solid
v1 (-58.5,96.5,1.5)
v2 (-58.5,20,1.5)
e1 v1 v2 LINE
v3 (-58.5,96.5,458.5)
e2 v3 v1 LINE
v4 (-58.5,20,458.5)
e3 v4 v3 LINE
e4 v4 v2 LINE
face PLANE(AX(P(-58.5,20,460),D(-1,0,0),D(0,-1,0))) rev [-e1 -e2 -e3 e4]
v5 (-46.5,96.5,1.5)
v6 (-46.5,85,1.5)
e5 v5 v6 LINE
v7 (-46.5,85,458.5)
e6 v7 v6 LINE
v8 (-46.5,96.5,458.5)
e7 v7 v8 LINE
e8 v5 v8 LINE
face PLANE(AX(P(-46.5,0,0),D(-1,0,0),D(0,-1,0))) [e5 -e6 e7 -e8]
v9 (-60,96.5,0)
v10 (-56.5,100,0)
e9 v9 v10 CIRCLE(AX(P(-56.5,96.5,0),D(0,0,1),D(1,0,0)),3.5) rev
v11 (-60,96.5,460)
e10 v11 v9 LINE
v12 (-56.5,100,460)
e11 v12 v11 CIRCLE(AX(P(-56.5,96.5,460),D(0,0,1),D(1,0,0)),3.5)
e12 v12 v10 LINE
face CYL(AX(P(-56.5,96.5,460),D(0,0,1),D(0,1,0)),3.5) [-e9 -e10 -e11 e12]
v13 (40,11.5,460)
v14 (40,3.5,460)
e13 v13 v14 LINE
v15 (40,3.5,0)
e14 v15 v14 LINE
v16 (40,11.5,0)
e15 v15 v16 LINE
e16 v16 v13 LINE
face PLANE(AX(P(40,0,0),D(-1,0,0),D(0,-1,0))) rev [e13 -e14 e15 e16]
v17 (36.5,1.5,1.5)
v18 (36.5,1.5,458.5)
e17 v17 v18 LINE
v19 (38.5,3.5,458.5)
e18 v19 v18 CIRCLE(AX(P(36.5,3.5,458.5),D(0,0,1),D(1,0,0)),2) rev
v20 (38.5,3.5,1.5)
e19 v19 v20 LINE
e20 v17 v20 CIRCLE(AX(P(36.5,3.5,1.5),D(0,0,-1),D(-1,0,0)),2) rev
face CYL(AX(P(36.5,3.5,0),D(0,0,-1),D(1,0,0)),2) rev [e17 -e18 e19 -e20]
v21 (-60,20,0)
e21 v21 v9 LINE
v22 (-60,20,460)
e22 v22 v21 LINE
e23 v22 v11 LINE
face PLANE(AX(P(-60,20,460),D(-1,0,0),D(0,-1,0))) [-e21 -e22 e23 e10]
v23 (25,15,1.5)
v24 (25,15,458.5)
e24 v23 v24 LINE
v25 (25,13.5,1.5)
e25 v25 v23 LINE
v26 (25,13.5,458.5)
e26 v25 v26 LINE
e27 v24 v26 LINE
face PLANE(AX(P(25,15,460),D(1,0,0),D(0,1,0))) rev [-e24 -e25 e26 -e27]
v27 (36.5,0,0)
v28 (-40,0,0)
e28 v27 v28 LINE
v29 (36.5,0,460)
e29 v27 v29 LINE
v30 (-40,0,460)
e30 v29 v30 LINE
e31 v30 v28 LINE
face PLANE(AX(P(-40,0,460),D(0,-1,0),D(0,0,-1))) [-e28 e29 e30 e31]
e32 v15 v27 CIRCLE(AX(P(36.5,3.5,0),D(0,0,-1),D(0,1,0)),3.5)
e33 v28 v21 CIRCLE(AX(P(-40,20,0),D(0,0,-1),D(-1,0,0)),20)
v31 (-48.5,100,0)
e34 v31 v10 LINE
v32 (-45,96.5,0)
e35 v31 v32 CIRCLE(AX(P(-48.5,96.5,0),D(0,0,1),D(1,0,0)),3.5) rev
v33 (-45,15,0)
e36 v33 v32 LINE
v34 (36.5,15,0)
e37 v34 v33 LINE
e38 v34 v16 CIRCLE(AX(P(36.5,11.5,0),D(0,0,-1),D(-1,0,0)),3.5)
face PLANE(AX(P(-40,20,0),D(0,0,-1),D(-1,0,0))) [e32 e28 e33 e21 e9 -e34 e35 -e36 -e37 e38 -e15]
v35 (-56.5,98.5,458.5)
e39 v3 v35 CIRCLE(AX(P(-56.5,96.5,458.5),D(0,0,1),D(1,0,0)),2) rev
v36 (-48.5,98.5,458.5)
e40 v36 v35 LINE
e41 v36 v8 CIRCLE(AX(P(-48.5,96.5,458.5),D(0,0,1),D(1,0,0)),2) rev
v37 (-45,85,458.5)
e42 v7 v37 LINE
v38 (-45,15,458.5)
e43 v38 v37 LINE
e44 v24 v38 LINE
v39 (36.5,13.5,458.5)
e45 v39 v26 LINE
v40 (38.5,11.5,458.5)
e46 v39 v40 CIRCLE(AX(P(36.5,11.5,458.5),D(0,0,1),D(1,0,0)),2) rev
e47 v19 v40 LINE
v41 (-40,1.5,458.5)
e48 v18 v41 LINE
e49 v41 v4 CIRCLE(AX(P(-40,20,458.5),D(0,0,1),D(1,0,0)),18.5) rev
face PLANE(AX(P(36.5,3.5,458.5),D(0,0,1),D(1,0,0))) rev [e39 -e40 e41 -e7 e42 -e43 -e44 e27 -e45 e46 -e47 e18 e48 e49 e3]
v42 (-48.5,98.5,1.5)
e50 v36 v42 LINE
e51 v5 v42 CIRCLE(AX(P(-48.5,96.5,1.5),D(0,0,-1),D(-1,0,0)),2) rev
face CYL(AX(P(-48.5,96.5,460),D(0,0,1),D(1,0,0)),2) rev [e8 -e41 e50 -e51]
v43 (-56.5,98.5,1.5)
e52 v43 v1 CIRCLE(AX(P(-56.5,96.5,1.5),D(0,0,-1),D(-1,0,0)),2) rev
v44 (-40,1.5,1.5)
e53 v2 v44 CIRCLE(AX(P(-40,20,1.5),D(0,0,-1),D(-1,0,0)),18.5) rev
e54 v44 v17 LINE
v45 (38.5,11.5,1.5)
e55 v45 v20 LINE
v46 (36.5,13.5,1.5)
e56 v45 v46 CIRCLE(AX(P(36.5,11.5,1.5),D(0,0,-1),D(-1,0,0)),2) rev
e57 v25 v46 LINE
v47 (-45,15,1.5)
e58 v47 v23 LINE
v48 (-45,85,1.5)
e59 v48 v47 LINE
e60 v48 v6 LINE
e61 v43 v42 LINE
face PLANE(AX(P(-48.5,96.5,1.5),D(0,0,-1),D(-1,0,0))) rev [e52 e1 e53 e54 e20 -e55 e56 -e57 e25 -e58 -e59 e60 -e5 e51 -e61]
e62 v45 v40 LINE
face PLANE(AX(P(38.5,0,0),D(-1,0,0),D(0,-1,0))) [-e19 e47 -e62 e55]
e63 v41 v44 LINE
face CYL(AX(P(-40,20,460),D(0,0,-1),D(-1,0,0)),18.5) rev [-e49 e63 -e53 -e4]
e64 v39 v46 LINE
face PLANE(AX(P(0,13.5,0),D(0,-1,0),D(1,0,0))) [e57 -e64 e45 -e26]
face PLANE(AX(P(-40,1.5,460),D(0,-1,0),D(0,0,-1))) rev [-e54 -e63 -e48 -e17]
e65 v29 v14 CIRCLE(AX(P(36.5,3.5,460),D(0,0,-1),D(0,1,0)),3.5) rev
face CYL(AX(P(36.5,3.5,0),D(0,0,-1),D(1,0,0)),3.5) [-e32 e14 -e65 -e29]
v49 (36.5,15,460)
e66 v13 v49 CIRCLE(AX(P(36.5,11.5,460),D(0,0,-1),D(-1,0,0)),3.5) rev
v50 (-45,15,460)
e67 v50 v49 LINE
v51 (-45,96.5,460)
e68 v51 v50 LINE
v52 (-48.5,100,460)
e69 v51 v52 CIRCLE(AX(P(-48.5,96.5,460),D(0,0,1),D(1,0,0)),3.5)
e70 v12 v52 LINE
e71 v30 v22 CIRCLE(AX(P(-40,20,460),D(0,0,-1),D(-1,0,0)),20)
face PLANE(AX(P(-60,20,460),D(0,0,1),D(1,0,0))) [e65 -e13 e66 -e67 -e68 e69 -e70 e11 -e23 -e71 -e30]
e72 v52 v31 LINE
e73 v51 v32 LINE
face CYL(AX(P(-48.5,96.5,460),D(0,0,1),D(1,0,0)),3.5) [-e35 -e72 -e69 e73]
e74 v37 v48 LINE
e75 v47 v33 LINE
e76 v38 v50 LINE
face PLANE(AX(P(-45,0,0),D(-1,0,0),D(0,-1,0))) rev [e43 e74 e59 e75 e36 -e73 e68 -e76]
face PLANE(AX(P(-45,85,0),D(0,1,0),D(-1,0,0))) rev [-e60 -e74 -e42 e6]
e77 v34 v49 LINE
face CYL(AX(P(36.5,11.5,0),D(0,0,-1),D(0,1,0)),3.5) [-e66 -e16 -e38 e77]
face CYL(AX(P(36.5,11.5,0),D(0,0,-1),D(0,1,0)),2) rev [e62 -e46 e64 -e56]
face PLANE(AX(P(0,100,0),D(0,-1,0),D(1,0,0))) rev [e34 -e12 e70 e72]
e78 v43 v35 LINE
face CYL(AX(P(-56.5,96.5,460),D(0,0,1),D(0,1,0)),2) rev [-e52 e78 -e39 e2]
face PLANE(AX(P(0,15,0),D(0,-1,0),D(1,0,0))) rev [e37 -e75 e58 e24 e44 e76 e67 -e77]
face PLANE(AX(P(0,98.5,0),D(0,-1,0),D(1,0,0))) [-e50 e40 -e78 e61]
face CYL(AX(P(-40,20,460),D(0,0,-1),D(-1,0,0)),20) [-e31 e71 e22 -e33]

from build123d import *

# Parameters (mm, degrees)
SM_BASE_FLANGE_1_DEPTH             = 460
SM_EDGE_FLANGE_1_STRIP_W           = 10
SM_EDGE_FLANGE_1_STRIP_H           = 1.5
SM_EDGE_FLANGE_1_STRIP_CUT_DEPTH   = 460
SM_EDGE_FLANGE_1_STRIP_2_W         = 10
SM_EDGE_FLANGE_1_STRIP_2_H         = 1.5
SM_EDGE_FLANGE_1_STRIP_CUT_2_DEPTH = 460
SM_EDGE_FLANGE_1_DEPTH             = 460
SM_EDGE_FLANGE_1_BEND_DEPTH        = 460
SM_EDGE_FLANGE_2_STRIP_W           = 10
SM_EDGE_FLANGE_2_STRIP_H           = 1.5
SM_EDGE_FLANGE_2_STRIP_CUT_DEPTH   = 460
SM_EDGE_FLANGE_2_STRIP_2_W         = 10
SM_EDGE_FLANGE_2_STRIP_2_H         = 1.5
SM_EDGE_FLANGE_2_STRIP_CUT_2_DEPTH = 460
SM_EDGE_FLANGE_2_DEPTH             = 460
SM_EDGE_FLANGE_2_BEND_DEPTH        = 460
EXTRUDE_START                      = -1.5
EXTRUDE_1_DEPTH                    = 1.5
EXTRUDE_2_DEPTH                    = 1.5


# Sheet-metal steps are written as plain solids
with BuildPart() as part:
    # 草图1 → 基体-法兰1 (new body)
    with BuildSketch(Plane.XY):
        with BuildLine():
            Line((-60, 100), (-60, 20))
            ThreePointArc((-60, 20), (-54.142135624, 5.857864376), (-40, 0))
            Line((-40, 0), (40, 0))
            Line((40, 0), (40, 1.5))
            Line((40, 1.5), (-40, 1.5))
            ThreePointArc((-40, 1.5), (-53.081475452, 6.918524548), (-58.5, 20))
            Line((-58.5, 20), (-58.5, 100))
            Line((-58.5, 100), (-60, 100))
        make_face()
    extrude(amount=SM_BASE_FLANGE_1_DEPTH)

    # 边线-法兰1 strip (across the edge) → 边线-法兰1 strip cut (cut)
    with BuildSketch(Plane(origin=(40, 1.5, 460), x_dir=(-1, 0, 0), z_dir=(0, 0, -1))):
        with Locations((-1.5, -0.75)):
            Rectangle(SM_EDGE_FLANGE_1_STRIP_W, SM_EDGE_FLANGE_1_STRIP_H)
    extrude(amount=SM_EDGE_FLANGE_1_STRIP_CUT_DEPTH, mode=Mode.SUBTRACT)

    # 边线-法兰1 strip 2 (across the edge) → 边线-法兰1 strip cut 2 (cut)
    with BuildSketch(Plane(origin=(-58.5, 100, 0), x_dir=(0, -1, 0), z_dir=(0, 0, 1))):
        with Locations((-1.5, -0.75)):
            Rectangle(SM_EDGE_FLANGE_1_STRIP_2_W, SM_EDGE_FLANGE_1_STRIP_2_H)
    extrude(amount=SM_EDGE_FLANGE_1_STRIP_CUT_2_DEPTH, mode=Mode.SUBTRACT)

    # 边线-法兰1 section (across the edge) → 边线-法兰1 (add)
    with BuildSketch(Plane(origin=(40, 1.5, 460), x_dir=(-1, 0, 0), z_dir=(0, 0, -1))):
        with BuildLine():
            Line((0, 2), (0, 13.5))
            Line((0, 13.5), (1.5, 13.5))
            Line((1.5, 13.5), (1.5, 2))
            ThreePointArc((1.5, 2), (2.085786438, 0.585786438), (3.5, 0))
            Line((3.5, 0), (3.5, -1.5))
            ThreePointArc((3.5, -1.5), (1.025126266, -0.474873734), (0, 2))
        make_face()
    extrude(amount=SM_EDGE_FLANGE_1_DEPTH)

    # 边线-法兰1 section 2 (across the edge) → 边线-法兰1 bend (add)
    with BuildSketch(Plane(origin=(-58.5, 100, 0), x_dir=(0, -1, 0), z_dir=(0, 0, 1))):
        with BuildLine():
            Line((0, 2), (0, 13.5))
            Line((0, 13.5), (1.5, 13.5))
            Line((1.5, 13.5), (1.5, 2))
            ThreePointArc((1.5, 2), (2.085786438, 0.585786438), (3.5, 0))
            Line((3.5, 0), (3.5, -1.5))
            ThreePointArc((3.5, -1.5), (1.025126266, -0.474873734), (0, 2))
        make_face()
    extrude(amount=SM_EDGE_FLANGE_1_BEND_DEPTH)

    # 边线-法兰2 strip (across the edge) → 边线-法兰2 strip cut (cut)
    with BuildSketch(Plane(origin=(38.5, 15, 460), x_dir=(0, -1, 0), z_dir=(0, 0, -1))):
        with Locations((-1.5, -0.75)):
            Rectangle(SM_EDGE_FLANGE_2_STRIP_W, SM_EDGE_FLANGE_2_STRIP_H)
    extrude(amount=SM_EDGE_FLANGE_2_STRIP_CUT_DEPTH, mode=Mode.SUBTRACT)

    # 边线-法兰2 strip 2 (across the edge) → 边线-法兰2 strip cut 2 (cut)
    with BuildSketch(Plane(origin=(-45, 98.5, 0), x_dir=(-1, 0, 0), z_dir=(0, 0, 1))):
        with Locations((-1.5, -0.75)):
            Rectangle(SM_EDGE_FLANGE_2_STRIP_2_W, SM_EDGE_FLANGE_2_STRIP_2_H)
    extrude(amount=SM_EDGE_FLANGE_2_STRIP_CUT_2_DEPTH, mode=Mode.SUBTRACT)

    # 边线-法兰2 section (across the edge) → 边线-法兰2 (add)
    with BuildSketch(Plane(origin=(38.5, 15, 460), x_dir=(0, -1, 0), z_dir=(0, 0, -1))):
        with BuildLine():
            Line((0, 2), (0, 13.5))
            Line((0, 13.5), (1.5, 13.5))
            Line((1.5, 13.5), (1.5, 2))
            ThreePointArc((1.5, 2), (2.085786438, 0.585786438), (3.5, 0))
            Line((3.5, 0), (3.5, -1.5))
            ThreePointArc((3.5, -1.5), (1.025126266, -0.474873734), (0, 2))
        make_face()
    extrude(amount=SM_EDGE_FLANGE_2_DEPTH)

    # 边线-法兰2 section 2 (across the edge) → 边线-法兰2 bend (add)
    with BuildSketch(Plane(origin=(-45, 98.5, 0), x_dir=(-1, 0, 0), z_dir=(0, 0, 1))):
        with BuildLine():
            Line((0, 2), (0, 13.5))
            Line((0, 13.5), (1.5, 13.5))
            Line((1.5, 13.5), (1.5, 2))
            ThreePointArc((1.5, 2), (2.085786438, 0.585786438), (3.5, 0))
            Line((3.5, 0), (3.5, -1.5))
            ThreePointArc((3.5, -1.5), (1.025126266, -0.474873734), (0, 2))
        make_face()
    extrude(amount=SM_EDGE_FLANGE_2_BEND_DEPTH)

    # 草图22 → 凸台-拉伸1 (add)
    with BuildSketch(Plane.XY.offset(460).offset(EXTRUDE_START)):
        with BuildLine():
            Line((-45, 96.5), (-45, 85))
            Line((-45, 85), (-45, 15))
            Line((-45, 15), (25, 15))
            Line((25, 15), (36.5, 15))
            ThreePointArc((36.5, 15), (38.974873734, 13.974873734), (40, 11.5))
            Line((40, 11.5), (40, 3.5))
            ThreePointArc((40, 3.5), (38.974873734, 1.025126266), (36.5, 0))
            Line((36.5, 0), (-40, 0))
            ThreePointArc((-40, 0), (-54.142135624, 5.857864376), (-60, 20))
            Line((-60, 20), (-60, 96.5))
            ThreePointArc((-60, 96.5), (-58.974873734, 98.974873734), (-56.5, 100))
            Line((-56.5, 100), (-48.5, 100))
            ThreePointArc((-48.5, 100), (-46.025126266, 98.974873734), (-45, 96.5))
        make_face()
    extrude(amount=EXTRUDE_1_DEPTH)

    # 草图23 → 凸台-拉伸2 (add)
    with BuildSketch(Plane(origin=(0, 0, 0), x_dir=(-1, 0, 0), z_dir=(0, 0, -1))):
        with BuildLine():
            Line((-25, 15), (45, 15))
            Line((45, 15), (45, 85))
            Line((45, 85), (45, 96.5))
            ThreePointArc((45, 96.5), (46.025126266, 98.974873734), (48.5, 100))
            Line((48.5, 100), (56.5, 100))
            ThreePointArc((56.5, 100), (58.974873734, 98.974873734), (60, 96.5))
            Line((60, 96.5), (60, 20))
            ThreePointArc((60, 20), (54.142135624, 5.857864376), (40, 0))
            Line((40, 0), (-36.5, 0))
            ThreePointArc((-36.5, 0), (-38.974873734, 1.025126266), (-40, 3.5))
            Line((-40, 3.5), (-40, 11.5))
            ThreePointArc((-40, 11.5), (-38.974873734, 13.974873734), (-36.5, 15))
            Line((-36.5, 15), (-25, 15))
        make_face()
    extrude(amount=-EXTRUDE_2_DEPTH)


solid = part.part
